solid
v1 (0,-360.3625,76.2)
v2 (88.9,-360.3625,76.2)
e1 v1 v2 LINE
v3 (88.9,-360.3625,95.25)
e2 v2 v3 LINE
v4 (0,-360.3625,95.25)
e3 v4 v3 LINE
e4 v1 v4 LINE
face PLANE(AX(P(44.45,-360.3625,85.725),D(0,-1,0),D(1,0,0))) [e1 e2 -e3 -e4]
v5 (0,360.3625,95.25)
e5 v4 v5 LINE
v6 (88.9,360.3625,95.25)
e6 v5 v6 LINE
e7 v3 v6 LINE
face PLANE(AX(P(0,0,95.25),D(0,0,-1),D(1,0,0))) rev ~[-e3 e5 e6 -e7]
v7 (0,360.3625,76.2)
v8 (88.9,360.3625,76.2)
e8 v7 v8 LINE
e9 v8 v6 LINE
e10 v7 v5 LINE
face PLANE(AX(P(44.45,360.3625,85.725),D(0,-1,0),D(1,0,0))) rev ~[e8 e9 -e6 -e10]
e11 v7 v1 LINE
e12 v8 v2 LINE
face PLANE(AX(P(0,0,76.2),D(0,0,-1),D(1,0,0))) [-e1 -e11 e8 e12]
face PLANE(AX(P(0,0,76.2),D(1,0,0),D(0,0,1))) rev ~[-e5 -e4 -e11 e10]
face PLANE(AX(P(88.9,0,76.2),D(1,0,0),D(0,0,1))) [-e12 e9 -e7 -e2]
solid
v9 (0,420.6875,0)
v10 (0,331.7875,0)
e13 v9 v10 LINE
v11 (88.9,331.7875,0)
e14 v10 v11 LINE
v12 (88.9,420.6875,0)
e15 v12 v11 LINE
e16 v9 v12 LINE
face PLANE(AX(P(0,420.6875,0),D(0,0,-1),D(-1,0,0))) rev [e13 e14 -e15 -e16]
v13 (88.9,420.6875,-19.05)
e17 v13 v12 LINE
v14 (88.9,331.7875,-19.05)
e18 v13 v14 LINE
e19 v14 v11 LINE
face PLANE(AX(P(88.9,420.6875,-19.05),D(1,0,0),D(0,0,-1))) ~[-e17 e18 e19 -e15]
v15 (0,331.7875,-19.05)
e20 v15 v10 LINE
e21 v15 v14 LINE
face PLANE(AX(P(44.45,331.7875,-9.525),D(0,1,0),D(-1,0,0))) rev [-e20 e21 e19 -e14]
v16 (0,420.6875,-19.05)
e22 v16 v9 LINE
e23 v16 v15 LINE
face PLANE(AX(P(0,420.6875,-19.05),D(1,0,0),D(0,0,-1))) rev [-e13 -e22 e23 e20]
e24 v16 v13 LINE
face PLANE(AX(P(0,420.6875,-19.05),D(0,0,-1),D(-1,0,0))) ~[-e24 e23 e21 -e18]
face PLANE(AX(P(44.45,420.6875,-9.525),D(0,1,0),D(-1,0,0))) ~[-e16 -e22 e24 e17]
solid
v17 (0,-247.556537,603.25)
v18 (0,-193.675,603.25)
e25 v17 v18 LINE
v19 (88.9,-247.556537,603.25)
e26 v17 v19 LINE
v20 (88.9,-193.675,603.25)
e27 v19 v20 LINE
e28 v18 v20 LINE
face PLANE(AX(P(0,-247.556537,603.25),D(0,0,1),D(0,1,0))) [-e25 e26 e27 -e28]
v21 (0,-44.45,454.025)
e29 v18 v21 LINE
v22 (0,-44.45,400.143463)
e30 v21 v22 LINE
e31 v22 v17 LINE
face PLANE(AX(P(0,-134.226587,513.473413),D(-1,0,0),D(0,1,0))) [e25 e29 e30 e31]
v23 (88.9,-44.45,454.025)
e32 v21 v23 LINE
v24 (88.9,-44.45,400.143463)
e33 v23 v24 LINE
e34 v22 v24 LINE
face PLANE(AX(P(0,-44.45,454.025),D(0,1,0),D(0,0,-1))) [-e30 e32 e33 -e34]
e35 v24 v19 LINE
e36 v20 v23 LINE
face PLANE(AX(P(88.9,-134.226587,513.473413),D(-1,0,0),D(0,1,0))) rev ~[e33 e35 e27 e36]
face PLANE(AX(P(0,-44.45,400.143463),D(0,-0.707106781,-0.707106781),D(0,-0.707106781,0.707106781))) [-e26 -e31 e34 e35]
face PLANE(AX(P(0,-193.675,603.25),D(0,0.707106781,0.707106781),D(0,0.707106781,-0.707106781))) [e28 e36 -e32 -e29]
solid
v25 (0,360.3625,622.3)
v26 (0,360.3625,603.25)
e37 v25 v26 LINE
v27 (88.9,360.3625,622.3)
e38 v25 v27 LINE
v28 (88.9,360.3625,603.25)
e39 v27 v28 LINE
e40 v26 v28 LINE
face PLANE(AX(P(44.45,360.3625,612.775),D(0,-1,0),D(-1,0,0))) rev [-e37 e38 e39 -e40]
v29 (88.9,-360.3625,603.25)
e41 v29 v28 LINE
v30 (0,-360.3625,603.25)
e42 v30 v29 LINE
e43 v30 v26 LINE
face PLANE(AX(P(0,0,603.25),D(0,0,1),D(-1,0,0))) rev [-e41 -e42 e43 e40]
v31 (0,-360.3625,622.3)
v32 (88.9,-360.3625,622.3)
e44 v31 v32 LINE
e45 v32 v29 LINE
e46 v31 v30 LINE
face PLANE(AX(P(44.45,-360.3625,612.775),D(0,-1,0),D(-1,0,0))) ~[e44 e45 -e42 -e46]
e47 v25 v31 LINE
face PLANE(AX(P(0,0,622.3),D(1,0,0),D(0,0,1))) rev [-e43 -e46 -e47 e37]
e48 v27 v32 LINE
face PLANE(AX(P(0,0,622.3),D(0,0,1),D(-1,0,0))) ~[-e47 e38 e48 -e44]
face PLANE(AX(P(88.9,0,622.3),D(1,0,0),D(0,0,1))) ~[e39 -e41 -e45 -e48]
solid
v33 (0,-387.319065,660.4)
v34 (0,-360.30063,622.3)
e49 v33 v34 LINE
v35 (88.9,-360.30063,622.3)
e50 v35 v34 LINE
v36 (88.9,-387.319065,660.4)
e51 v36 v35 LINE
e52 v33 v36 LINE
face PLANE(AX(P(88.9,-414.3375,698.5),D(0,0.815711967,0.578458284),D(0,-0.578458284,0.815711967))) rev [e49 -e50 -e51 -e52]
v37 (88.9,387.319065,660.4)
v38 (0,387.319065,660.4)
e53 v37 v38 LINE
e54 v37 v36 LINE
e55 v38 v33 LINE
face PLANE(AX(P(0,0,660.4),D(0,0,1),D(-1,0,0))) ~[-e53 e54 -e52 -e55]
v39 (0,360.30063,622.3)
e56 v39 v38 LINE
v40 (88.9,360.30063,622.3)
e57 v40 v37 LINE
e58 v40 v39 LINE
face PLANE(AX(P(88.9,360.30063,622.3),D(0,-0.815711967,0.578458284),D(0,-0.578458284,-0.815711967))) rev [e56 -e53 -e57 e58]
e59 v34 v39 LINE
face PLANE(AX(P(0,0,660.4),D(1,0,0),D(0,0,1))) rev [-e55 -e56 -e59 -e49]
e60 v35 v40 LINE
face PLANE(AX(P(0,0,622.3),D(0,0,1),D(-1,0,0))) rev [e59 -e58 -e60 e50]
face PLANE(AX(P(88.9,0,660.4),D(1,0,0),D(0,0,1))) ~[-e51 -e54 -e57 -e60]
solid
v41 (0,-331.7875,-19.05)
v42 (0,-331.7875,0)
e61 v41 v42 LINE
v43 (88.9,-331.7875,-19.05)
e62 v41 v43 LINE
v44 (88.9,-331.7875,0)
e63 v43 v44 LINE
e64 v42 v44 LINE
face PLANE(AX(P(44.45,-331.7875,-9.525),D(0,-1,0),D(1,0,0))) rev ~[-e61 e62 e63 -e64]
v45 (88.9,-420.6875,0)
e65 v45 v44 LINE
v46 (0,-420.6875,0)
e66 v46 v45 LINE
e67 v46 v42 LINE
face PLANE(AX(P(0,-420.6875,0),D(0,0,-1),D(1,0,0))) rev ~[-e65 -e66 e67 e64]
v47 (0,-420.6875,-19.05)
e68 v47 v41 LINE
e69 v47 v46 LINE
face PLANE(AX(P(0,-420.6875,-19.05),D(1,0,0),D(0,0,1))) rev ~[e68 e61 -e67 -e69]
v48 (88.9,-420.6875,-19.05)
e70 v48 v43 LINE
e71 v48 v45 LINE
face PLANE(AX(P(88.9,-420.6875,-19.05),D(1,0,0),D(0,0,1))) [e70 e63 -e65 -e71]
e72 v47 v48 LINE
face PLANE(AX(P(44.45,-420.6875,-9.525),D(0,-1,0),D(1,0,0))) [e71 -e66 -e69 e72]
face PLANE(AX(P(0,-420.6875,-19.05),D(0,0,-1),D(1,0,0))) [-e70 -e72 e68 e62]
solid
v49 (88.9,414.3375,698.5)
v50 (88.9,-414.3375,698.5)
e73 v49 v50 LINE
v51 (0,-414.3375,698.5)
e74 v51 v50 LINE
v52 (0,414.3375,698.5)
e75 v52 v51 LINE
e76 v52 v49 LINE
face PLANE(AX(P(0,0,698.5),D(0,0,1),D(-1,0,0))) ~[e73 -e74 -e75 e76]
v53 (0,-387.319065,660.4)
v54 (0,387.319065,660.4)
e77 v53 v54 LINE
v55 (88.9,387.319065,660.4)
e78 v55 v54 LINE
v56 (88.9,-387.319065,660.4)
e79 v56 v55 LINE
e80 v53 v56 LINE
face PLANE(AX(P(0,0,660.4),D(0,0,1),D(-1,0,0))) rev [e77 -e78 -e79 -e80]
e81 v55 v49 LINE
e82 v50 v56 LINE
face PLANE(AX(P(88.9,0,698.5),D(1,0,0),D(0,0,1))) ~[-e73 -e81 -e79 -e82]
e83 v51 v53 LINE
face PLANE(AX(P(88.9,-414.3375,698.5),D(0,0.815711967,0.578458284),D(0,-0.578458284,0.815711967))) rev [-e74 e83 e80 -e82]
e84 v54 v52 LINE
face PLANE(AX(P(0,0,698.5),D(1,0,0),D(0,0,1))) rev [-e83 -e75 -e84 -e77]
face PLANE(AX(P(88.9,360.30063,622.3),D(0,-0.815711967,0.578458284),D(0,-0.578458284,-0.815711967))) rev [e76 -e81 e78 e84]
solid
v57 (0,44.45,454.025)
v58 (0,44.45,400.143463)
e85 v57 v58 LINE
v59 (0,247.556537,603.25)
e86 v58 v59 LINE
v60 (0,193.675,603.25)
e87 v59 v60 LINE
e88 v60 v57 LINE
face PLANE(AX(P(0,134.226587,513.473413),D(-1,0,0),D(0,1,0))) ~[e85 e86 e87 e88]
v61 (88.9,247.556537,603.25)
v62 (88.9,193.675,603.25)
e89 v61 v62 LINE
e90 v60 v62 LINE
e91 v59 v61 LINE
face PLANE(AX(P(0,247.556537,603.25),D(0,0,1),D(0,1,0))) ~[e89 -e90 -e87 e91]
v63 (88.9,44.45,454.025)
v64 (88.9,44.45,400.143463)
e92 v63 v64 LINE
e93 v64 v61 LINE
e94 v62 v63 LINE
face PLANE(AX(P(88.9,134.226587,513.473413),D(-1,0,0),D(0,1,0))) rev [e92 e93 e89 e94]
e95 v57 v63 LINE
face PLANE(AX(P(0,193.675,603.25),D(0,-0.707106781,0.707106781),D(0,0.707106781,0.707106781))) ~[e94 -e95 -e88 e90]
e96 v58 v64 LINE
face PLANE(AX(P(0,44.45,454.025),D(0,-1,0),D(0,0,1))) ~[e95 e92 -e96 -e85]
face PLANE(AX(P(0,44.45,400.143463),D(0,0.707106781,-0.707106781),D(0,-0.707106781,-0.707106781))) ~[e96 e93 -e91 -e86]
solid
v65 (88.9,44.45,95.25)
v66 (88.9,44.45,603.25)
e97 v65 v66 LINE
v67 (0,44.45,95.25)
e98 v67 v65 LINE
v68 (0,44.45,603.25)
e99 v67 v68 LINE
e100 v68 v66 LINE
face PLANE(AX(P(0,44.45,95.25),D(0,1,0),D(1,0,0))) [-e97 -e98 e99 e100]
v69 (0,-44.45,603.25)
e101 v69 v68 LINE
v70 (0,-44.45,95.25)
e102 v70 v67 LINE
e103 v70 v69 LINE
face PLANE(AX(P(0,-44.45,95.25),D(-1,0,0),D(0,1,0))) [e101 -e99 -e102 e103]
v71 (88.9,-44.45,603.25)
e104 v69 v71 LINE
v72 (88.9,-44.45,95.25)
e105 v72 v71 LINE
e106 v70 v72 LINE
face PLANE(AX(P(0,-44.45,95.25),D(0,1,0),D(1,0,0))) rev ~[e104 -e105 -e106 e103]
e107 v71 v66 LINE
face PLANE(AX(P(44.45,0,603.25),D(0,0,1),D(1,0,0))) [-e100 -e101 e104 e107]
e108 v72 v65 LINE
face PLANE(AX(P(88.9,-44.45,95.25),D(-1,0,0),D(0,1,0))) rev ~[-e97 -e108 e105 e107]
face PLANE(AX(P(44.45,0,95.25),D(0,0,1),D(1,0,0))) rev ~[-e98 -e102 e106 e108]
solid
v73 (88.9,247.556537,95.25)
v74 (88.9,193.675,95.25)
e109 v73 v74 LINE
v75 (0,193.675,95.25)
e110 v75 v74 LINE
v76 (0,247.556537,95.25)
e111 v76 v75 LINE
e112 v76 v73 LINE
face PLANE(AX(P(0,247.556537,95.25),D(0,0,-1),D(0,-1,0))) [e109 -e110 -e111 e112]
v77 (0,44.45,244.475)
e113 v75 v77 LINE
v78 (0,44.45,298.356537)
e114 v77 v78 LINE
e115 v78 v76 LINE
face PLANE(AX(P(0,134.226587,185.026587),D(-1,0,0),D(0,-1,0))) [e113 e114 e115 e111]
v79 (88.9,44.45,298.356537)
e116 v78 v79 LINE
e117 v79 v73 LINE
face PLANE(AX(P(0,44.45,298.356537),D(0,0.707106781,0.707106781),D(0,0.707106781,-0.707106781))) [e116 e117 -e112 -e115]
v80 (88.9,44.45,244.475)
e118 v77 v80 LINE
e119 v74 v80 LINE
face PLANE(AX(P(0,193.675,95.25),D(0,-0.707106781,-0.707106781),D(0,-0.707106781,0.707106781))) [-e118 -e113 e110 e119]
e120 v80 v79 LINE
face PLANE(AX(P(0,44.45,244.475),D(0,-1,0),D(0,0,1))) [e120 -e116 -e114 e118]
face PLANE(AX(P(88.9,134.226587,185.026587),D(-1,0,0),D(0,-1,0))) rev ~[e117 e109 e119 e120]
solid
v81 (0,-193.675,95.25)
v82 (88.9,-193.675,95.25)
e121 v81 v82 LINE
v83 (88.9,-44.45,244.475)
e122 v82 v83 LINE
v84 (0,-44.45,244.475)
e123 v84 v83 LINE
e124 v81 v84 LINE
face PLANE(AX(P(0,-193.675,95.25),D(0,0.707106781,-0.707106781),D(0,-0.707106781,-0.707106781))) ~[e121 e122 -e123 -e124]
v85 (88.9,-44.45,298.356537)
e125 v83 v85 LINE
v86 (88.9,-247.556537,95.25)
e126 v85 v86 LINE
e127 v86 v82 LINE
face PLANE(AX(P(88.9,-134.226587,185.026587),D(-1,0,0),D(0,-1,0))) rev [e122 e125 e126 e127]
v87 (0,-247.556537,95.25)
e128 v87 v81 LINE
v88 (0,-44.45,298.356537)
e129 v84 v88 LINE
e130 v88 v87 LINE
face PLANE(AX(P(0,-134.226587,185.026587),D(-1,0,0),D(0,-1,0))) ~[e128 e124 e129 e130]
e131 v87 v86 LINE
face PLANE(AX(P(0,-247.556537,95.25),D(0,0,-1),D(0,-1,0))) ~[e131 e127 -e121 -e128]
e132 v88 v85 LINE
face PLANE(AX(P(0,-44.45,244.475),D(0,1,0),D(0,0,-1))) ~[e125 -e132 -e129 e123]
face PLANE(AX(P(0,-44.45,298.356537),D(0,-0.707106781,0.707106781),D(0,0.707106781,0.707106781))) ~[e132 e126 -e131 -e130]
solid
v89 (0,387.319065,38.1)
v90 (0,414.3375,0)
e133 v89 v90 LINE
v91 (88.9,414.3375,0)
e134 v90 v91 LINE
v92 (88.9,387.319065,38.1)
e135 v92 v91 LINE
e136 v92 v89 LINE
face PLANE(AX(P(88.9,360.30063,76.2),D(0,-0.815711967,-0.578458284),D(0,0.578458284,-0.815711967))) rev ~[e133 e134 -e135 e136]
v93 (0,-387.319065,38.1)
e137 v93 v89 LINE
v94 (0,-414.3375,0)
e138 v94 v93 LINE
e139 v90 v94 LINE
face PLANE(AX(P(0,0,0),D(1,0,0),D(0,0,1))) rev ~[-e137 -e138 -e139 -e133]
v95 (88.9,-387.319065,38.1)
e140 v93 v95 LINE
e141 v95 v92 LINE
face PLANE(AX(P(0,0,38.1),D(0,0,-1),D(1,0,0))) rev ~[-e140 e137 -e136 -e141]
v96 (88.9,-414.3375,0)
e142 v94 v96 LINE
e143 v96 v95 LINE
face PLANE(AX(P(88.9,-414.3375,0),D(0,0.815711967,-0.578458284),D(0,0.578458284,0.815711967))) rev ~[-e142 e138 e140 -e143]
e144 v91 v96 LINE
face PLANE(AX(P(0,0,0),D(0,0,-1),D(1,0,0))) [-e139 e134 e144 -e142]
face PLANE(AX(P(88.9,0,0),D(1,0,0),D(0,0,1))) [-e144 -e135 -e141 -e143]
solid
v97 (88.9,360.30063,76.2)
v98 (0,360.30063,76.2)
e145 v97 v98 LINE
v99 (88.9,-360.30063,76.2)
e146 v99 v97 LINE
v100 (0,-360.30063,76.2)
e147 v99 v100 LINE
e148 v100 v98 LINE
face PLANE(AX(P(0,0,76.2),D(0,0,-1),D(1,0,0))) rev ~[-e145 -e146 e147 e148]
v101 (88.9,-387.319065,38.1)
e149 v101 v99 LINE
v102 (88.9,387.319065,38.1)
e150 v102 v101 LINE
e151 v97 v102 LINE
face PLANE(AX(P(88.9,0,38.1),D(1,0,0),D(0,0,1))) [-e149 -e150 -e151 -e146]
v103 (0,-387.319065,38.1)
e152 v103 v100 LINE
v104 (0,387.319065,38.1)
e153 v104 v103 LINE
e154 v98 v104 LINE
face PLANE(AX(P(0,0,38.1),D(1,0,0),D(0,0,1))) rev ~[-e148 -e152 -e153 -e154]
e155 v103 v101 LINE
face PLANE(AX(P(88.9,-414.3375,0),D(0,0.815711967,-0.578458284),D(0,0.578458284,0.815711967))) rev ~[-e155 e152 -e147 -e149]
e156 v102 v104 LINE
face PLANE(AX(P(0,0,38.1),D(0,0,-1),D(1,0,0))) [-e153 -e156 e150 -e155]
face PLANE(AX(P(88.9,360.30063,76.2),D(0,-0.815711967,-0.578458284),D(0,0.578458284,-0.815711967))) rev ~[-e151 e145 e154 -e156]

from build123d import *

# Parameters (mm, degrees)
F0_W      = 88.9
F0_H      = 38.1
F1_DEPTH  = 414.3375
F2_W      = 88.9
F2_H      = 38.1
F3_DEPTH  = 414.3375
F5_W      = 88.9
F5_H      = 19.05
F6_DEPTH  = 88.9
F8_W      = 88.9
F8_H      = 19.05
F9_DEPTH  = 360.3625
F11_DEPTH = 88.901
F12_W     = 88.9
F12_H     = 88.9
F13_DEPTH = 508
F17_DEPTH = 88.9


# Not quite as in the source:
# - a feature names something its author has since deleted; it is built from what else it names


with BuildPart() as f1:
    # F0 (on Front) → F1 (new body, symmetric)
    with BuildSketch(Plane.XZ):
        with Locations((44.45, 19.05)):
            Rectangle(F0_W, F0_H)
    extrude(amount=F1_DEPTH, both=True)


with BuildPart() as f3:
    # F2 (on Front) → F3 (new body, symmetric)
    with BuildSketch(Plane.XZ):
        with Locations((44.45, 57.15)):
            Rectangle(F2_W, F2_H)
    extrude(amount=F3_DEPTH, both=True)


with BuildPart() as f6:
    # F5 (on offset) → F6 (new body)
    with BuildSketch(Plane.XZ.offset(420.6875)):
        with Locations((44.45, -9.525)):
            Rectangle(F5_W, F5_H)
    extrude(amount=-F6_DEPTH)


with BuildPart() as f7_1:
    # F7: instance of F6
    add(f6.part.mirror(Plane.XZ))


with BuildPart() as f9:
    # F8 (on Front) → F9 (new body, symmetric)
    with BuildSketch(Plane.XZ):
        with Locations((44.45, 85.725)):
            Rectangle(F8_W, F8_H)
    extrude(amount=F9_DEPTH, both=True)


with BuildPart() as f11_tool:
    # F10 (on face) → F11 (new body, through all)
    with BuildSketch(Plane.YZ.offset(88.9)):
        Polygon((-360.300630331, 76.2), (-414.3375, 76.2), (-414.3375, 0), align=None)
        Polygon((360.300630331, 76.2), (414.3375, 0), (414.3375, 76.2), align=None)
    extrude(amount=-F11_DEPTH)


with BuildPart() as f1_1:
    add(f1.part)

    # F11: cut by f11_tool
    add(f11_tool.part, mode=Mode.SUBTRACT)


with BuildPart() as f3_1:
    add(f3.part)

    # F11: cut by f11_tool
    add(f11_tool.part, mode=Mode.SUBTRACT)


with BuildPart() as f13:
    # F12 (on face) → F13 (new body)
    with BuildSketch(Plane.XY.offset(95.25)):
        with Locations((44.45, 0)):
            Rectangle(F12_W, F12_H)
    extrude(amount=F13_DEPTH)


with BuildPart() as f15_1:
    # F15: instance of F9
    add(f9.part.mirror(Plane.XY.offset(349.25)))


with BuildPart() as f15_2:
    # F15: instance of F3
    add(f3_1.part.mirror(Plane.XY.offset(349.25)))


with BuildPart() as f15_3:
    # F15: instance of F1
    add(f1_1.part.mirror(Plane.XY.offset(349.25)))


with BuildPart() as f17:
    # F16 (on face) → F17 (new body)
    with BuildSketch(Plane(origin=(0, 0, 0), x_dir=(0, -1, 0), z_dir=(-1, 0, 0))):
        Polygon((-247.5565367264, 95.25), (-193.675, 95.25), (-44.45, 244.475), (-44.45, 298.3565367264), align=None)
    extrude(amount=-F17_DEPTH)


with BuildPart() as f18_1:
    # F18: instance of F17
    add(f17.part.mirror(Plane.XZ))


with BuildPart() as f19_1:
    # F19: instance of F17
    add(f17.part.mirror(Plane.XY.offset(349.25)))


with BuildPart() as f19_2:
    # F19: instance of F18_1
    add(f18_1.part.mirror(Plane.XY.offset(349.25)))


solid = Compound([f6.part, f7_1.part, f9.part, f1_1.part, f3_1.part, f13.part, f15_1.part, f15_2.part, f15_3.part, f17.part, f18_1.part, f19_1.part, f19_2.part])
